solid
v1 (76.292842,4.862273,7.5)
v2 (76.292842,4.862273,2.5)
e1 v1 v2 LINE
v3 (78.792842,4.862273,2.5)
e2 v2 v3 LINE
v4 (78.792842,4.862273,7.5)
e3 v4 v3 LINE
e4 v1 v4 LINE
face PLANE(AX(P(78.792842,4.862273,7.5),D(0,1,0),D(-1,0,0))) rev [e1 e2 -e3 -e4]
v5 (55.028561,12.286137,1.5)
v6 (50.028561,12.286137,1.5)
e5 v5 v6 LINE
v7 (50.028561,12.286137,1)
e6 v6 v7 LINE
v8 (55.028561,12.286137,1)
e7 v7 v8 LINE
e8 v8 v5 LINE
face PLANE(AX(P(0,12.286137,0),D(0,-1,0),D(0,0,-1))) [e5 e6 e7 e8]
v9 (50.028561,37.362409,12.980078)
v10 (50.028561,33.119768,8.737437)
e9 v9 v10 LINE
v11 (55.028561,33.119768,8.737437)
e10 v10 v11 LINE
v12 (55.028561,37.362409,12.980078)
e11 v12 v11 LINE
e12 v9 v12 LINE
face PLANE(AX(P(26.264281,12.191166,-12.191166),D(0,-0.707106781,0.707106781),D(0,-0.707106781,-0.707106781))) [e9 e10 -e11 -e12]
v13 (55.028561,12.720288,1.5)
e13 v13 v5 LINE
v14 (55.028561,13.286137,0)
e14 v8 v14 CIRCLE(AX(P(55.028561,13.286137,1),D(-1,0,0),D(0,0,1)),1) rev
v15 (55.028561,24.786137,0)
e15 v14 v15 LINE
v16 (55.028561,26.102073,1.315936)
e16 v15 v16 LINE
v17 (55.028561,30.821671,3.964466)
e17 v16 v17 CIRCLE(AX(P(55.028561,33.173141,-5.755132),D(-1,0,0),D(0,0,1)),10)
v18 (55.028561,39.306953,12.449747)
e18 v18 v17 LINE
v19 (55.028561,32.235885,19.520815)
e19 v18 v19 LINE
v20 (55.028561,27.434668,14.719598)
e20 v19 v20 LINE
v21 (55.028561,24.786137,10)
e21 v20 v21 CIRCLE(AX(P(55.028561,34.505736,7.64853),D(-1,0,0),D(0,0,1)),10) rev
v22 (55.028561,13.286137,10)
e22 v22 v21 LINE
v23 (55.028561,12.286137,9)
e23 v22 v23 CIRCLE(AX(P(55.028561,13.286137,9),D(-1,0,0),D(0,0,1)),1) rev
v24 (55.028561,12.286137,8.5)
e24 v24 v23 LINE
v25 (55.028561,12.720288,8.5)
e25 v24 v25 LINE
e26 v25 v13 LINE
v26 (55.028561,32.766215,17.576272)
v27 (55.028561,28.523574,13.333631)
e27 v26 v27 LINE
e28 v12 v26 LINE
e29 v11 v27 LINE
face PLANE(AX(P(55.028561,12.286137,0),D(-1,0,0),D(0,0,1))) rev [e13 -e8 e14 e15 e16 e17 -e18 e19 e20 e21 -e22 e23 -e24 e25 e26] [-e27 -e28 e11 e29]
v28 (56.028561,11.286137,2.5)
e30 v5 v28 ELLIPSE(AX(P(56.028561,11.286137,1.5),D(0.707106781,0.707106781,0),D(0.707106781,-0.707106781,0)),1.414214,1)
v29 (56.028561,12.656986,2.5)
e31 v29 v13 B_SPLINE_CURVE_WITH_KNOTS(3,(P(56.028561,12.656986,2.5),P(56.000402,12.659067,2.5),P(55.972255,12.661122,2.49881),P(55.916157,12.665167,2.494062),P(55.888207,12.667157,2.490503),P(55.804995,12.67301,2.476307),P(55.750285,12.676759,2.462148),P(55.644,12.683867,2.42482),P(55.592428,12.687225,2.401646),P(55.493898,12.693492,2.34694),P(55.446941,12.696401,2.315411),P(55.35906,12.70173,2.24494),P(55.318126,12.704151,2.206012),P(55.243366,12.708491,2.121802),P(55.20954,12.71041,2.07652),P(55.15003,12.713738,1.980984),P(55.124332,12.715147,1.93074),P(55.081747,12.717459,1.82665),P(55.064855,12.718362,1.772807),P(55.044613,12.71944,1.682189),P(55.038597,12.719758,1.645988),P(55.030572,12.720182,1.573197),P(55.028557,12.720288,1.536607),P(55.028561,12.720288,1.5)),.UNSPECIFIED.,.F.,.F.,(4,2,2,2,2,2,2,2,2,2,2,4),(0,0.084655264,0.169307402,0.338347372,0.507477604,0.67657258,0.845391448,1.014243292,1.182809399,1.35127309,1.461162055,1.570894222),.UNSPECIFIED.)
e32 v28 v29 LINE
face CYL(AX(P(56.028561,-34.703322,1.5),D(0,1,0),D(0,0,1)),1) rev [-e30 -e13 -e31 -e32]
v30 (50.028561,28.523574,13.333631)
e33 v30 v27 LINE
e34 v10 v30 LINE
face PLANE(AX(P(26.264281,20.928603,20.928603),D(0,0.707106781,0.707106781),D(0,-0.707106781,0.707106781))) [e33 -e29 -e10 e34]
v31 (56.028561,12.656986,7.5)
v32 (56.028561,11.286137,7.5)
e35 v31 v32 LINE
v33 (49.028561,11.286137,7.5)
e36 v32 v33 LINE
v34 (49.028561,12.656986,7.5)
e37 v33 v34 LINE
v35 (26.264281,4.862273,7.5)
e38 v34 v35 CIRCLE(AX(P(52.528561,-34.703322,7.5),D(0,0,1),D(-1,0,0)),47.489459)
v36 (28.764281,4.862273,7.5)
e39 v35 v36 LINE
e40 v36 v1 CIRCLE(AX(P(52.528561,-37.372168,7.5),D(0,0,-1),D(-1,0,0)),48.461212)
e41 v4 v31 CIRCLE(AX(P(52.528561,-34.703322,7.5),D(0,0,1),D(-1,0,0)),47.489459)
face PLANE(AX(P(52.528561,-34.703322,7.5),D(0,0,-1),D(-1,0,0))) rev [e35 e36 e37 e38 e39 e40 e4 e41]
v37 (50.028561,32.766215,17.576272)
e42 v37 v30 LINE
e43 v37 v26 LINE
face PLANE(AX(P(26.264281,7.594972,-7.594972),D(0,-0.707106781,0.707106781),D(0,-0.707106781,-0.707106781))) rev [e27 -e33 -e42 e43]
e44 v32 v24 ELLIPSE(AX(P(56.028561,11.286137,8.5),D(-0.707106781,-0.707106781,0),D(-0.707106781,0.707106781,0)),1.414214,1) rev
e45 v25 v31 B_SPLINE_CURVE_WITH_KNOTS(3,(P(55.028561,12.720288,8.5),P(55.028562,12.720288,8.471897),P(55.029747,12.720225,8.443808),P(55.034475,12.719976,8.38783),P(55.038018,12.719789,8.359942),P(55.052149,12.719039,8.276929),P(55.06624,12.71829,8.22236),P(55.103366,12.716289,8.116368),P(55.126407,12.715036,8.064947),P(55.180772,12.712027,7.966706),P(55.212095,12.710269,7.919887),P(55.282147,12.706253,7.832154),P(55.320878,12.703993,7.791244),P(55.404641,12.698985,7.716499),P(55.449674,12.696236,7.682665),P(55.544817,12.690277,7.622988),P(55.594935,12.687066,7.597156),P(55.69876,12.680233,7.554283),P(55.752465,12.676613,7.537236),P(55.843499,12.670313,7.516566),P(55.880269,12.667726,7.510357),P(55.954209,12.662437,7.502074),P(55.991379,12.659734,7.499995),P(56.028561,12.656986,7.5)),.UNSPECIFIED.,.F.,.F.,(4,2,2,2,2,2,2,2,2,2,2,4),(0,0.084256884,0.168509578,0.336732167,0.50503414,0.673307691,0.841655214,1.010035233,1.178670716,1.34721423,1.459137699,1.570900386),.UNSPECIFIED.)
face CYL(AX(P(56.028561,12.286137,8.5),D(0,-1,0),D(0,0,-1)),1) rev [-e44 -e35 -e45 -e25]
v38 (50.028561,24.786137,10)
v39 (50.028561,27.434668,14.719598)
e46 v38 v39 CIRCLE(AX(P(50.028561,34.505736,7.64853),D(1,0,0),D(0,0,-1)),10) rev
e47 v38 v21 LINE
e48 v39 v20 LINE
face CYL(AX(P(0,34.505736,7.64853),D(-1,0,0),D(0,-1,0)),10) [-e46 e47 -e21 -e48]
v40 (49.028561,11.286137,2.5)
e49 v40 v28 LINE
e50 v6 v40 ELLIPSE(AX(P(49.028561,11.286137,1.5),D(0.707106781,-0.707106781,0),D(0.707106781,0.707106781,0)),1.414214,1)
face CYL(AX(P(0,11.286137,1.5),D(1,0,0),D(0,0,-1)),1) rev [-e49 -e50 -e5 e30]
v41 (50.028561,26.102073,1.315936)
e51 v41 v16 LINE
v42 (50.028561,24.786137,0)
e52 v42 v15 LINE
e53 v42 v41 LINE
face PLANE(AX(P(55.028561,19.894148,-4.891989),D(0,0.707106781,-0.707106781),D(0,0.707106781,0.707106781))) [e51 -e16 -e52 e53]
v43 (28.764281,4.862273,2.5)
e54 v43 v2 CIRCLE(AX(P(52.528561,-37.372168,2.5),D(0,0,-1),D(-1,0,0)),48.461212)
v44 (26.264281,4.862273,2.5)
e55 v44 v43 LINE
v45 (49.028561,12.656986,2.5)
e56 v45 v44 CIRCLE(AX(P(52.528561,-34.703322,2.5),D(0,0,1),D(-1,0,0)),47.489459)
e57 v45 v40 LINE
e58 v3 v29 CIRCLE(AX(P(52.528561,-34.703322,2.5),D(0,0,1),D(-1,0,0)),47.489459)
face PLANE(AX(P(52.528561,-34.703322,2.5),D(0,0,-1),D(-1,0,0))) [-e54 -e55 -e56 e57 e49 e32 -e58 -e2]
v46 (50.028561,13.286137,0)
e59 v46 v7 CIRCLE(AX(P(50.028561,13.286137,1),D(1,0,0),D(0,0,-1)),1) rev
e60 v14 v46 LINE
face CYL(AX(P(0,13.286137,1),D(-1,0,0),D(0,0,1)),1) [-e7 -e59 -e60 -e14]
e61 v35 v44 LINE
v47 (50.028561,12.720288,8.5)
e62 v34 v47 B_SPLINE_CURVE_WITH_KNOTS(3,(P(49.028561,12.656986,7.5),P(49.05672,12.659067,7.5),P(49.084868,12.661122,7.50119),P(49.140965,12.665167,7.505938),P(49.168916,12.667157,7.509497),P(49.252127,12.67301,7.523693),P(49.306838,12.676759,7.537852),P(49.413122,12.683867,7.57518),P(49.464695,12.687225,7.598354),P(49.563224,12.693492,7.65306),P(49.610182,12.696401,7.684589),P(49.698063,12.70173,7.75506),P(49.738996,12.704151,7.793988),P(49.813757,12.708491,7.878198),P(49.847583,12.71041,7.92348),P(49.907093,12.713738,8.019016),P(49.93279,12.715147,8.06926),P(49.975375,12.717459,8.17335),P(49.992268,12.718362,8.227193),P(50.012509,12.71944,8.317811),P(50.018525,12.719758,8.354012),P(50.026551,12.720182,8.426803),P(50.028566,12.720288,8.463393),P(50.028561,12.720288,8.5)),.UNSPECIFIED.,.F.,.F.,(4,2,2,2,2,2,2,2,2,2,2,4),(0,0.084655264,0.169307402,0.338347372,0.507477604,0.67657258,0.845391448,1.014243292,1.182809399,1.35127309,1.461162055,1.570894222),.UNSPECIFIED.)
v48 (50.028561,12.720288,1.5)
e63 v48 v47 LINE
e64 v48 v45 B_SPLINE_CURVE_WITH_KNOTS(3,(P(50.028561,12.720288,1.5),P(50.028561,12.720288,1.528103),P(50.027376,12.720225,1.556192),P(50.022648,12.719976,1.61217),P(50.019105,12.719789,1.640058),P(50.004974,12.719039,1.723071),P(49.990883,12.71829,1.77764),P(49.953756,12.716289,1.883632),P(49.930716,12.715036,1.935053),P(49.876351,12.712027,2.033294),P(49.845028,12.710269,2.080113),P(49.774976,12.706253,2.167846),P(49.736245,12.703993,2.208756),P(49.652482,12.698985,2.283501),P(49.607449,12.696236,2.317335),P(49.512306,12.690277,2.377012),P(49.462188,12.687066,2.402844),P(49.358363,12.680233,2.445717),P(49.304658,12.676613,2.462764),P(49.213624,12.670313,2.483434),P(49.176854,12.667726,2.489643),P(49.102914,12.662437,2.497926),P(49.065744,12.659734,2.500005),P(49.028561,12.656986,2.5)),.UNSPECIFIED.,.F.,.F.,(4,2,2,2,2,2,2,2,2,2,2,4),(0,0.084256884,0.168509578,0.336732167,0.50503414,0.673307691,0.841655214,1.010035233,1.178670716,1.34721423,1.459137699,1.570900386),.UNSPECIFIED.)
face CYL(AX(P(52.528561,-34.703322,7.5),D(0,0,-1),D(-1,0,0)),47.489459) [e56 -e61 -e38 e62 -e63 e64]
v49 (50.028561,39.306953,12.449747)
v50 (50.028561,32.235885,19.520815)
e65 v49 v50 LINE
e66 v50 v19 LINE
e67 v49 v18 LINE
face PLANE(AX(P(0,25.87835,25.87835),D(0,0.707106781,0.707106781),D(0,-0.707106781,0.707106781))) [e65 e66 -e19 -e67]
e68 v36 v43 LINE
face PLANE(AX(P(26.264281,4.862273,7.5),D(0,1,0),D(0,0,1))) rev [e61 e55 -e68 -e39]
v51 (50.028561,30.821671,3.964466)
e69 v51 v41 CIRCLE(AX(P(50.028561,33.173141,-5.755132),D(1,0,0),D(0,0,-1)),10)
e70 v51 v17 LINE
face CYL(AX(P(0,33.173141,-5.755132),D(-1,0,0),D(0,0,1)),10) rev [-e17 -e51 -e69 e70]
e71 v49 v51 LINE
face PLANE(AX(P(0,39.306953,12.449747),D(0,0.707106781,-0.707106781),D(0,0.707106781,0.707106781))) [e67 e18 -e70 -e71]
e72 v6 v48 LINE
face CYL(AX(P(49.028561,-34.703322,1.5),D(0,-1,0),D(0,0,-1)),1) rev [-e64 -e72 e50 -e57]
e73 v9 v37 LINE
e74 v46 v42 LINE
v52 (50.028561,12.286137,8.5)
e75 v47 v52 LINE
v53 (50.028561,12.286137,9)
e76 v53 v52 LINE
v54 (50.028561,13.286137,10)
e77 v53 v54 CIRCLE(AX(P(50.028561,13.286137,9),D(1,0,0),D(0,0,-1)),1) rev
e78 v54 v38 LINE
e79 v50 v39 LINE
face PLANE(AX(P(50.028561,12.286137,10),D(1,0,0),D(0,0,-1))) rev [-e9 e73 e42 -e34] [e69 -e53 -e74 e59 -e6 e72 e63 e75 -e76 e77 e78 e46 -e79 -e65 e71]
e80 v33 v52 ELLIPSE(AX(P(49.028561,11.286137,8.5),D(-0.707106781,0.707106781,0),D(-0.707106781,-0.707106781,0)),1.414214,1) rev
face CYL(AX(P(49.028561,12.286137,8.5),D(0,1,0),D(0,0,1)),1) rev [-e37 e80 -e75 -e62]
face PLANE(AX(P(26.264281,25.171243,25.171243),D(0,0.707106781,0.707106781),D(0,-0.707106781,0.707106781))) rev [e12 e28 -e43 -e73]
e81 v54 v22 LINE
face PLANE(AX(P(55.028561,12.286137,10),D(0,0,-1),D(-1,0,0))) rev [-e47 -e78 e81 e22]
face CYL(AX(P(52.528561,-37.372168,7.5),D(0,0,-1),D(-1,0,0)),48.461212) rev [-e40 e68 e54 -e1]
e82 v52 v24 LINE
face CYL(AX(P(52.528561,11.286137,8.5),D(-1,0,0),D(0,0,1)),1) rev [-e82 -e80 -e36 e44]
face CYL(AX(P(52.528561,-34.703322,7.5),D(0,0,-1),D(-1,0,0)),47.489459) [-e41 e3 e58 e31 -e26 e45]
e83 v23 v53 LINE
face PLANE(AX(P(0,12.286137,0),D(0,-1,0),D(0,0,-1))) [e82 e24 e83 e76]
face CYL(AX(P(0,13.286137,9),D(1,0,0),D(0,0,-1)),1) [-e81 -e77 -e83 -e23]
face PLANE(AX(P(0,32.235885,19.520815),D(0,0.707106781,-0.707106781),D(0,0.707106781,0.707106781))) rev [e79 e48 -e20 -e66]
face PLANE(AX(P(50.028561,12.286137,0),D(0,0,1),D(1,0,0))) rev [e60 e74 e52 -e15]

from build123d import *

# Parameters (mm, degrees)
BOSS_EXTRUDE1_DEPTH = 10
SCALE1_SCALE        = 0.5
SKETCH4_W           = 2.5
SKETCH4_H           = 5
BOSS_EXTRUDE4_DEPTH = 12
SKETCH5_W           = 5
SKETCH5_H           = 10
BOSS_EXTRUDE5_DEPTH = 0.5
BOSS_EXTRUDE6_REACH = 83.657
SKETCH7_W           = 5
SKETCH7_H           = 7.071067812
SKETCH8_W           = 5
SKETCH8_H           = 1.464466094
SKETCH8_H_2         = 7.071067812
BOSS_EXTRUDE7_DEPTH = 12
FILLET1_START       = 49
FILLET1_DEPTH       = 7
FILLET1_START_2     = 50.028561354
FILLET1_2_DEPTH     = 5
CUT_EXTRUDE1_DEPTH  = 53.473637274
FILLET2_R           = 1


with BuildPart() as part:
    # Sketch1 → Boss-Extrude1 (new body)
    with BuildSketch(Plane.XY):
        with BuildLine():
            Line((0, 0), (5, 0))
            ThreePointArc((5, 0), (52.528561354, 12.453541306), (100.057122708, 0))
            Line((100.057122708, 0), (105.057122708, 0))
            ThreePointArc((105.057122708, 0), (52.528561354, 15.847728612), (0, 0))
        make_face()
    extrude(amount=BOSS_EXTRUDE1_DEPTH)


with BuildPart() as part_1:
    # Scale1: scaled about (52.528561354, 9.724546383, 5)
    add(part.part.scale(SCALE1_SCALE).moved(Location((26.264280677, 4.862273191, 2.5))))



with BuildPart() as body_2:
    # Sketch4 → Boss-Extrude4 (new body)
    with BuildSketch(Plane(origin=(0, 12.786137497, 0), x_dir=(1, 0, 0), z_dir=(0, 1, 0))):
        with Locations((53.778561354, -5)):
            Rectangle(SKETCH4_W, SKETCH4_H)
        Polygon((50.028561354, 0), (50.028561354, -2.5), (52.528561354, -2.5), (55.028561354, -2.5), (55.028561354, 0), align=None)
        with Locations((51.278561354, -5)):
            Rectangle(SKETCH4_W, SKETCH4_H)
        Polygon((52.528561354, -7.5), (50.028561354, -7.5), (50.028561354, -10), (55.028561354, -10), (55.028561354, -7.5), align=None)
    extrude(amount=BOSS_EXTRUDE4_DEPTH)


with BuildPart() as part_2:
    add(part_1.part)

    add(body_2.part)  # Boss-Extrude5 merges body 2
    # Sketch5 → Boss-Extrude5 (add)
    with BuildSketch(Plane.XZ.offset(-12.786137497)):
        with Locations((52.528561354, 5)):
            Rectangle(SKETCH5_W, SKETCH5_H)
    extrude(amount=BOSS_EXTRUDE5_DEPTH)

    # Boss-Extrude6: up to this plane
    boss_extrude6_end = Plane(origin=(50.028561354, 12.286137497, 0), z_dir=(0, 0, 1))
    # Sketch7 → Boss-Extrude6 (add, up to the surface)
    with BuildSketch(Plane(origin=(0, 17.393068749, 17.393068749), x_dir=(1, 0, 0), z_dir=(0, 0.7071067811865464, 0.7071067811865488)), mode=Mode.PRIVATE) as boss_extrude6_sk1:
        with Locations((52.528561354, 13.990911998)):
            Rectangle(SKETCH7_W, SKETCH7_H)
    boss_extrude6_tool1 = split(extrude(boss_extrude6_sk1.sketch, amount=-BOSS_EXTRUDE6_REACH, mode=Mode.PRIVATE), bisect_by=boss_extrude6_end, keep=Keep.BOTH, mode=Mode.PRIVATE)
    add(boss_extrude6_tool1.solids().sort_by_distance((52.528561, 27.286137, 7.5))[0])

    # Sketch8 → Boss-Extrude7 (add)
    with BuildSketch(Plane(origin=(0, 17.393068749, 17.393068749), x_dir=(1, 0, 0), z_dir=(0, 0.7071067811865465, 0.7071067811865487))):
        with Locations((52.528561354, 18.258678951)):
            Rectangle(SKETCH8_W, SKETCH8_H)
        with Locations((52.528561354, 13.990911998)):
            Rectangle(SKETCH8_W, SKETCH8_H_2)
        with Locations((52.528561354, 9.723145045)):
            Rectangle(SKETCH8_W, SKETCH8_H)
    extrude(amount=BOSS_EXTRUDE7_DEPTH)

    # Fillet1: read off the stored shape, not the designer's step
    # Fillet1 outline → Fillet1 (cut)
    with BuildSketch(Plane.YZ.offset(FILLET1_START)):
        with BuildLine():
            Line((23.750603591, 11.035533906), (24.786137497, 10))
            ThreePointArc((24.786137497, 10), (25.785055254, 12.542376711), (27.434667987, 14.719598301))
            Line((27.434667987, 14.719598301), (23.750603591, 11.035533906))
        make_face()
    extrude(amount=FILLET1_DEPTH, mode=Mode.SUBTRACT)

    # Fillet1 2 outline → Fillet1 2 (add)
    with BuildSketch(Plane.YZ.offset(FILLET1_START_2)):
        with BuildLine():
            Line((29.786137497, 5), (26.102073102, 1.315935604))
            ThreePointArc((26.102073102, 1.315935604), (28.279294693, 2.965548337), (30.821671403, 3.964466094))
            Line((30.821671403, 3.964466094), (29.786137497, 5))
        make_face()
    extrude(amount=FILLET1_2_DEPTH)

    # Sketch9 → Cut-Extrude1 (cut, through all)
    with BuildSketch(Plane(origin=(55.028561354, 0, 0), x_dir=(0, 0, -1), z_dir=(1, 0, 0))):
        Polygon((-12.980077554, 37.362409129), (-17.576271632, 32.766215052), (-13.333630945, 28.523574364), (-8.737436867, 33.119768442), align=None)
    extrude(amount=-CUT_EXTRUDE1_DEPTH, mode=Mode.SUBTRACT)

    # Fillet2
    fillet2_edges = [part_2.edges().sort_by_distance(p)[0] for p in [
        (52.528561354, 12.286137497, 2.5),
        (55.028561354, 12.503212632, 2.5),
        (50.028561354, 12.503212632, 2.5),
        (50.028561354, 12.503212632, 7.5),
        (55.028561354, 12.503212632, 7.5),
        (52.528561354, 12.286137497, 10),
        (52.528561354, 12.286137497, 7.5),
        (52.528561354, 12.286137497, 0),
    ]]
    fillet(fillet2_edges, radius=FILLET2_R)


solid = part_2.part
